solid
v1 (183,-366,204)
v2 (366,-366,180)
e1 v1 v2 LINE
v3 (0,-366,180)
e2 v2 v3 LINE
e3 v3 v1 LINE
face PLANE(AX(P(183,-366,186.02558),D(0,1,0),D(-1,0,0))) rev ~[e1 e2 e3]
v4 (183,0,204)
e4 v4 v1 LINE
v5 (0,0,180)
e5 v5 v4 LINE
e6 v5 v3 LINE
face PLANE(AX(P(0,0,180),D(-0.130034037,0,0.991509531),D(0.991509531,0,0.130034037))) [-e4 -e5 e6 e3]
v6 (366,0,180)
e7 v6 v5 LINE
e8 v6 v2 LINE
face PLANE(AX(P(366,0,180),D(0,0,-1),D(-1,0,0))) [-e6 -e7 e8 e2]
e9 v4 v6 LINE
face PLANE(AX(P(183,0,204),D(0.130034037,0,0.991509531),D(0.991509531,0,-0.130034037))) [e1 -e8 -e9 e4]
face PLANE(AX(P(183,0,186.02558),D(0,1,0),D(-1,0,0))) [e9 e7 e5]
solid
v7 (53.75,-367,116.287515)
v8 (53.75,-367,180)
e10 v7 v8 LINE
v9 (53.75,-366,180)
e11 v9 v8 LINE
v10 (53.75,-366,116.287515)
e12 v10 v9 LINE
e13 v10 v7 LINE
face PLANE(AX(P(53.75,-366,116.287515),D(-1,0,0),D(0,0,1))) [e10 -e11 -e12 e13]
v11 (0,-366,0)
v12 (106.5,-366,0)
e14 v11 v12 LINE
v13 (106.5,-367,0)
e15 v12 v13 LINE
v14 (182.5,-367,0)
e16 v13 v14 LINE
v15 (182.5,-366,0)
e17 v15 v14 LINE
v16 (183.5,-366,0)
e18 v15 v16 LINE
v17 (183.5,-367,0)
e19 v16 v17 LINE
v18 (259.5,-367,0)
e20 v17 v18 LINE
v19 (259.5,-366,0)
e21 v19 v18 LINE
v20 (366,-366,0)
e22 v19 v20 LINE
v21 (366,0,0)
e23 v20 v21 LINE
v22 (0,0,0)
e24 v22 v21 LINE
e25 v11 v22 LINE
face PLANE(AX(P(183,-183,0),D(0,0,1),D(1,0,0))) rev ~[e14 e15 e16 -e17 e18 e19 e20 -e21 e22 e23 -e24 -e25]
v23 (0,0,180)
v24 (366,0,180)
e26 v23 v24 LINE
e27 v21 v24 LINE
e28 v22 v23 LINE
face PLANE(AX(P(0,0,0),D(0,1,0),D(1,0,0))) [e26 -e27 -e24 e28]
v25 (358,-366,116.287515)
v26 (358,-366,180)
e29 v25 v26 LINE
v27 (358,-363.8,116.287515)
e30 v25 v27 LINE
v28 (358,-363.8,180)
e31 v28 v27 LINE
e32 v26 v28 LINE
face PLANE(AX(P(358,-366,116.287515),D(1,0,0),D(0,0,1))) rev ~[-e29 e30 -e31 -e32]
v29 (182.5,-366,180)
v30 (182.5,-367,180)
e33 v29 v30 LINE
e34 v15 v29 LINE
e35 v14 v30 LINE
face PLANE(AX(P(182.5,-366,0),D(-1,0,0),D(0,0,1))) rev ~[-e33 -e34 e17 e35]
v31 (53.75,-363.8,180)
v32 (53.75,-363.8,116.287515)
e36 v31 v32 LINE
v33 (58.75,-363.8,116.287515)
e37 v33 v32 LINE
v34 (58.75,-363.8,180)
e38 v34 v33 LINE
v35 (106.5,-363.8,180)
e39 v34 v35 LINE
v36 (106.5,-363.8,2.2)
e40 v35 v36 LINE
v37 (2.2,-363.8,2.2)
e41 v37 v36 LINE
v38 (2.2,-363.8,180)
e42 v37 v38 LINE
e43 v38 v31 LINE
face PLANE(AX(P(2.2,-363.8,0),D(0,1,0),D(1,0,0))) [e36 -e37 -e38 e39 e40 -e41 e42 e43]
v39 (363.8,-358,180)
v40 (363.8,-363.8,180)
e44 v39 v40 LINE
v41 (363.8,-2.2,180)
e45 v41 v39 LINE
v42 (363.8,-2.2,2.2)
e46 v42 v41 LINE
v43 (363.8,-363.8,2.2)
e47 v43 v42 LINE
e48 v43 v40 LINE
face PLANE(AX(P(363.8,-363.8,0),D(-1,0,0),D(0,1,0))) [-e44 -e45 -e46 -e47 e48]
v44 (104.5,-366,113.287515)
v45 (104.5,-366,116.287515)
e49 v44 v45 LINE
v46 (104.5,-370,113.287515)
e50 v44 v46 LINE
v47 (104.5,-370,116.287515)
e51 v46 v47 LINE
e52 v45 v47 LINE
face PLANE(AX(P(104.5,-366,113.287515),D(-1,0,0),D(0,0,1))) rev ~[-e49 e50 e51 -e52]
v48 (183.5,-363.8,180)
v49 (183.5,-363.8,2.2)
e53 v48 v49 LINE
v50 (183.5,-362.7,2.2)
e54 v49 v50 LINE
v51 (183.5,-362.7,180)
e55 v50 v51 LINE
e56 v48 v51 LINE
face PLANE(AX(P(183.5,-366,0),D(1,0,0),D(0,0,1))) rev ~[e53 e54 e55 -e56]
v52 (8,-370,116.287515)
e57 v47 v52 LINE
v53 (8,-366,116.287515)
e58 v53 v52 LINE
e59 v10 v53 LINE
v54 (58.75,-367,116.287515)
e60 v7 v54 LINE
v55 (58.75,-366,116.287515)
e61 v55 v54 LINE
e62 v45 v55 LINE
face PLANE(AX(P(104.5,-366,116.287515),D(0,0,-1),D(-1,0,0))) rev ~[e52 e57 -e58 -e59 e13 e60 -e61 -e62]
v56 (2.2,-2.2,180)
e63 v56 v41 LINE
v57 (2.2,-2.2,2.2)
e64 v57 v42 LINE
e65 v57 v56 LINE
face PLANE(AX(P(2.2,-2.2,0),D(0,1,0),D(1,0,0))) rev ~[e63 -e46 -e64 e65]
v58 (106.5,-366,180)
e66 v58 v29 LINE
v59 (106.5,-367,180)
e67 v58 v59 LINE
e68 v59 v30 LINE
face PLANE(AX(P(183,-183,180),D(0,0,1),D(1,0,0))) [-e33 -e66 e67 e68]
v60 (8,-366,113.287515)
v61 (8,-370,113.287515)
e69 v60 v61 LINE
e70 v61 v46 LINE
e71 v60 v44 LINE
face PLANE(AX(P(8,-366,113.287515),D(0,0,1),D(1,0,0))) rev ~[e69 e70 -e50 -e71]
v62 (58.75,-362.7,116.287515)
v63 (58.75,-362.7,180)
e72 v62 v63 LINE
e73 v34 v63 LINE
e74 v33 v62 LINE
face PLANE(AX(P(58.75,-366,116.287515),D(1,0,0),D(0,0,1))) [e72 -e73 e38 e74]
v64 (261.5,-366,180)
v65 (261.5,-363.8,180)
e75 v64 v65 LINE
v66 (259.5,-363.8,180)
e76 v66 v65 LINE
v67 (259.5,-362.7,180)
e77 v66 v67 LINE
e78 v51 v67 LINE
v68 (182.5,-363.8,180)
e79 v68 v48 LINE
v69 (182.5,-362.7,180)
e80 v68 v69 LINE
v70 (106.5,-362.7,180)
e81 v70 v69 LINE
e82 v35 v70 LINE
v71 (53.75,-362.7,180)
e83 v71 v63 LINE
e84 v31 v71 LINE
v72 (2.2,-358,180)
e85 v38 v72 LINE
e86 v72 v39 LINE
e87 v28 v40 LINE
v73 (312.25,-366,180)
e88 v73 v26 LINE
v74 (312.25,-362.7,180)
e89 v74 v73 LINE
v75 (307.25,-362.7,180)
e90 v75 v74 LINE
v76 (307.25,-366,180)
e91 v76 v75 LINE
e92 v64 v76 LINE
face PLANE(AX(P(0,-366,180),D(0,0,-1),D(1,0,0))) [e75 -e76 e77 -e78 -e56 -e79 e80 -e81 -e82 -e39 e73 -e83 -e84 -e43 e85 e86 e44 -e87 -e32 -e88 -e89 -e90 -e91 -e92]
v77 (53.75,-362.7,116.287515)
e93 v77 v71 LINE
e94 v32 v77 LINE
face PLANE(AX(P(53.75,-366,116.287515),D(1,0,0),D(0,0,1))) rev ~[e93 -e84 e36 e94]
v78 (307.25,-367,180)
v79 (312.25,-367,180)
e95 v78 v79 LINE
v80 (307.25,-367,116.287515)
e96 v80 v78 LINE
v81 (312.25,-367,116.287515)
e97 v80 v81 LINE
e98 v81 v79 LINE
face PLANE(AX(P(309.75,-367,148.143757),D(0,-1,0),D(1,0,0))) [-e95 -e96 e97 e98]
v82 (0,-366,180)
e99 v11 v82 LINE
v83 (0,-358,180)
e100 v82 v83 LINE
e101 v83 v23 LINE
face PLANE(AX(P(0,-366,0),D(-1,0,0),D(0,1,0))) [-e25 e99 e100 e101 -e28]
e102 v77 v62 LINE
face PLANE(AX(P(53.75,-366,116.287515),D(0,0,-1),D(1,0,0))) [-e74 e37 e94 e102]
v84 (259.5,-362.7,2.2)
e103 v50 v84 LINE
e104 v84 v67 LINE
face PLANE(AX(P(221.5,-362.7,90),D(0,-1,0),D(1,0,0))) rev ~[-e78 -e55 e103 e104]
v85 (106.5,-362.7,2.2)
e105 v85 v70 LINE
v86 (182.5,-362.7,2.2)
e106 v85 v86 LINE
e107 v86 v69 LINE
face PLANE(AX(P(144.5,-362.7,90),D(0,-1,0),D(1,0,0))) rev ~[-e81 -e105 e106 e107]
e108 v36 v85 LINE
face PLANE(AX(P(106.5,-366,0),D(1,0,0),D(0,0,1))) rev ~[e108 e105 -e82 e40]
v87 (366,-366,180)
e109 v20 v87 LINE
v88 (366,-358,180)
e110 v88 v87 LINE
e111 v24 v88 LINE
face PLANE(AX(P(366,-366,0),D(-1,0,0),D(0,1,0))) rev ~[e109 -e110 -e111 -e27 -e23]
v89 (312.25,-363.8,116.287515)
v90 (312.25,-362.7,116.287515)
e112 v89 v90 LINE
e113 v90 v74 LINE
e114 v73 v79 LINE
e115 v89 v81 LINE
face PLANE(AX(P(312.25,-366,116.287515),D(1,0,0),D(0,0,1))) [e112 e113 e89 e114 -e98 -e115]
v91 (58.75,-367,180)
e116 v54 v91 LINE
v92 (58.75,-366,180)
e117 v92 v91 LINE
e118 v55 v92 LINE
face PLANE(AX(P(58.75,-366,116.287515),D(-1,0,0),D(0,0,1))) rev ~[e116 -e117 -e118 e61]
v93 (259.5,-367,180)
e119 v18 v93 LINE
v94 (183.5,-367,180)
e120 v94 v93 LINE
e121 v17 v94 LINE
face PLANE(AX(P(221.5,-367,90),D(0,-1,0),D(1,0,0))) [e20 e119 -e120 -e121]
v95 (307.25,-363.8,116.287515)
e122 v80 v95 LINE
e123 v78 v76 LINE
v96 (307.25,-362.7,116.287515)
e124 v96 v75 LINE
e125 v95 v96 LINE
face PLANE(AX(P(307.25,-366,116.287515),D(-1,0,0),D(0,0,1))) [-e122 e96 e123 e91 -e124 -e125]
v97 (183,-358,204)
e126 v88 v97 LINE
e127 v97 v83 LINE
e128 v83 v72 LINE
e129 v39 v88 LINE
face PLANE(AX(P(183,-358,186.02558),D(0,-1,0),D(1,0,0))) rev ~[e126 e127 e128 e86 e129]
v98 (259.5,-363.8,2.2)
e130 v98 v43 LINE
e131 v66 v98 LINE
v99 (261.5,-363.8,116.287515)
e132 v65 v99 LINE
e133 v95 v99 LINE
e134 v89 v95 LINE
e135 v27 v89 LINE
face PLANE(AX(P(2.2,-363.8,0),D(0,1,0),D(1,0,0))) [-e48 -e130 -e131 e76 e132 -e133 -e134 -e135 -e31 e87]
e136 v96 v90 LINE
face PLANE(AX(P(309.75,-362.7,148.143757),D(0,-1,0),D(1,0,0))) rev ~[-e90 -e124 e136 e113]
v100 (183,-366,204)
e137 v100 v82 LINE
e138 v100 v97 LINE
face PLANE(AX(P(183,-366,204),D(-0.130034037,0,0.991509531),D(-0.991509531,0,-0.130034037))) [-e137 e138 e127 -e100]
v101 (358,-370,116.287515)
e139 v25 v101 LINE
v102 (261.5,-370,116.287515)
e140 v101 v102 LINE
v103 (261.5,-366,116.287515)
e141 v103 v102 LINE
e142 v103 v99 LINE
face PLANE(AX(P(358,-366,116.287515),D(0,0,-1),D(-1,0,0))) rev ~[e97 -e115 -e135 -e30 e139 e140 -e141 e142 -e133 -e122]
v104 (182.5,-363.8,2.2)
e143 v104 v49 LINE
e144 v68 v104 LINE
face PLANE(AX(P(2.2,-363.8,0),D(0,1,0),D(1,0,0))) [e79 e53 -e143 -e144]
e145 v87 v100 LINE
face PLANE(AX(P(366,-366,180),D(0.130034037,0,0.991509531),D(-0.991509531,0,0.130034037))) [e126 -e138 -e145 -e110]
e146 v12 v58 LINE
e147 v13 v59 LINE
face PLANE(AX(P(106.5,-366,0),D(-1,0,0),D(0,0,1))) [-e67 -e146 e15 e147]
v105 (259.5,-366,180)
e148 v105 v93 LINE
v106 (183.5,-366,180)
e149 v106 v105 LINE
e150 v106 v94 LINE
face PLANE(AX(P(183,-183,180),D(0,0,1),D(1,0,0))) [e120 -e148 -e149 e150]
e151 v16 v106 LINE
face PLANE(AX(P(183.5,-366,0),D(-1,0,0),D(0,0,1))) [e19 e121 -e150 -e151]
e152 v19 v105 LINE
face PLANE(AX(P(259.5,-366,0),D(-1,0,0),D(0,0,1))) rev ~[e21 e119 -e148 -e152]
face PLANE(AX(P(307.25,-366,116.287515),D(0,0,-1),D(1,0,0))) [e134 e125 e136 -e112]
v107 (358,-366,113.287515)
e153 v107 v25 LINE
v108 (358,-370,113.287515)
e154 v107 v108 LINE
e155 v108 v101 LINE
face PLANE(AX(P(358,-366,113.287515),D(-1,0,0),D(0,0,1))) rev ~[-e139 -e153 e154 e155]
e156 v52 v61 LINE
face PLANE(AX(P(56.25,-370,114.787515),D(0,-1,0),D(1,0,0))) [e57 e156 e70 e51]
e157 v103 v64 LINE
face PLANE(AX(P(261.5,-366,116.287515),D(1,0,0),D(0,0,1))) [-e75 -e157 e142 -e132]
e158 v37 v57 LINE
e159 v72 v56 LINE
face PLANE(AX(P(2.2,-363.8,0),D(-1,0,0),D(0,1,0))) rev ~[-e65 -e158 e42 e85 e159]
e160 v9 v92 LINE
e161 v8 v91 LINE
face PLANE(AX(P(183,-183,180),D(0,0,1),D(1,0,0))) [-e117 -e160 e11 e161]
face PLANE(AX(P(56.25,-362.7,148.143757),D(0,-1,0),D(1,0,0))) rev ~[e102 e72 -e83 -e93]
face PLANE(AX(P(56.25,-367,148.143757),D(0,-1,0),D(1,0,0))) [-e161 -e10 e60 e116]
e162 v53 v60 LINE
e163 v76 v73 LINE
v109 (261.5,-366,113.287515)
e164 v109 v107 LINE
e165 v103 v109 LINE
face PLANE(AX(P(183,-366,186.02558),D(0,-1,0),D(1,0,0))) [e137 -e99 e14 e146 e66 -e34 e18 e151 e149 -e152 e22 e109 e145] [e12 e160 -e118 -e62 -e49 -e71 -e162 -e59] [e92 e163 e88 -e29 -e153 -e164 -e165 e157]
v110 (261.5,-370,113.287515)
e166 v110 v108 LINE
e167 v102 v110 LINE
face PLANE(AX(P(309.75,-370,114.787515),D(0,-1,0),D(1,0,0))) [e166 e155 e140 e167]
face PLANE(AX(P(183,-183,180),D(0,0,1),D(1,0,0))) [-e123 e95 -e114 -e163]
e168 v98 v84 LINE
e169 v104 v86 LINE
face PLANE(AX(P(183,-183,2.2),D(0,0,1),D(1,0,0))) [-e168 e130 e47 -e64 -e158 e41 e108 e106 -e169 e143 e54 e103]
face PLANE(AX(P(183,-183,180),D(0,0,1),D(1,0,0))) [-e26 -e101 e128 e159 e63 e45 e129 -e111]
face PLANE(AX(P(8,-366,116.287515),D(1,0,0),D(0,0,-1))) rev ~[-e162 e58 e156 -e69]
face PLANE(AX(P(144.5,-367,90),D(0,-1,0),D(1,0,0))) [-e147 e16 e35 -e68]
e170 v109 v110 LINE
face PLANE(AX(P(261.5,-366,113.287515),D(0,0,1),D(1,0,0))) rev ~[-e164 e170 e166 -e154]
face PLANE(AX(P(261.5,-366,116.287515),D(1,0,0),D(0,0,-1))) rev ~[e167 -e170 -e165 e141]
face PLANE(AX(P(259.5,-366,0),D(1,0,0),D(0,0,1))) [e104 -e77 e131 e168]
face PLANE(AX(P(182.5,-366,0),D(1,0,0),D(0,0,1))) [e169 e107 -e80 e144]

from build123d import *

# Parameters (mm, degrees)
F0_W          = 366
F0_H          = 366
F0_W_2        = 361.6
F0_H_2        = 361.6
F1_DEPTH      = 180
F2_DEPTH      = 2.2
F3_W          = 76
F3_H          = 180
F3_W_2        = 5
F3_H_2        = 63.7124854326
F4_DEPTH      = 1
F4_DEPTH_BACK = 3.3
F3_W_3        = 45.75
F5_DEPTH      = 25
F6_DEPTH      = 8
F7_DEPTH      = 4
F9_DEPTH      = 366


# Not quite as in the source:
# - a feature names something its author has since deleted; it is built from what else it names


with BuildPart() as f1:
    # F0 (on Top) → F1 (new body)
    with BuildSketch(Plane.XY):
        with Locations((183, -183)):
            Rectangle(F0_W, F0_H)
        with Locations((183, -183)):
            Rectangle(F0_W_2, F0_H_2, mode=Mode.SUBTRACT)
    extrude(amount=F1_DEPTH)

    # F0 (on Top) → F2 (join)
    with BuildSketch(Plane.XY):
        with Locations((183, -183)):
            Rectangle(F0_W_2, F0_H_2)
    extrude(amount=F2_DEPTH)

    # F3 (on face) → F4 (join, two sides)
    with BuildSketch(Plane.XZ.offset(366)) as f4_sk:
        with Locations((144.5, 90)):
            Rectangle(F3_W, F3_H)
        with Locations((221.5, 90)):
            Rectangle(F3_W, F3_H)
        with Locations((56.25, 148.1437572837)):
            Rectangle(F3_W_2, F3_H_2)
        with Locations((309.75, 148.1437572837)):
            Rectangle(F3_W_2, F3_H_2)
    extrude(amount=F4_DEPTH)
    extrude(f4_sk.sketch, amount=-F4_DEPTH_BACK)

    # F3 (on face) → F5 (cut)
    with BuildSketch(Plane.XZ.offset(366)):
        Polygon((104.5, 180), (106.5, 180), (182.5, 180), (183.5, 180), (259.5, 180), (261.5, 180), (307.25, 180), (312.25, 180), (358, 180), (366, 180), (183, 204), (0, 180), (8, 180), (53.75, 180), (58.75, 180), align=None)
        with Locations((284.375, 148.1437572837)):
            Rectangle(F3_W_3, F3_H_2)
        with Locations((335.125, 148.1437572837)):
            Rectangle(F3_W_3, F3_H_2)
    extrude(amount=-F5_DEPTH, mode=Mode.SUBTRACT)

    # F3 (on face) → F6 (join)
    with BuildSketch(Plane.XZ.offset(366)):
        Polygon((104.5, 180), (106.5, 180), (182.5, 180), (183.5, 180), (259.5, 180), (261.5, 180), (307.25, 180), (312.25, 180), (358, 180), (366, 180), (183, 204), (0, 180), (8, 180), (53.75, 180), (58.75, 180), align=None)
    extrude(amount=-F6_DEPTH)

    # F3 (on face) → F7 (join)
    with BuildSketch(Plane.XZ.offset(366)):
        Polygon((307.25, 116.2875145674), (261.5, 116.2875145674), (261.5, 113.2875145674), (358, 113.2875145674), (358, 116.2875145674), (312.25, 116.2875145674), align=None)
        Polygon((104.5, 113.2875145674), (104.5, 116.2875145674), (58.75, 116.2875145674), (53.75, 116.2875145674), (8, 116.2875145674), (8, 113.2875145674), align=None)
    extrude(amount=F7_DEPTH)


with BuildPart() as f9:
    # F8 (on face) → F9 (new body)
    with BuildSketch(Plane(origin=(0, 0, 0), x_dir=(-1, 0, 0), z_dir=(0, 1, 0))):
        Polygon((-183, 204), (-366, 180), (0, 180), align=None)
    extrude(amount=-F9_DEPTH)


solid = Compound([f1.part, f9.part])
